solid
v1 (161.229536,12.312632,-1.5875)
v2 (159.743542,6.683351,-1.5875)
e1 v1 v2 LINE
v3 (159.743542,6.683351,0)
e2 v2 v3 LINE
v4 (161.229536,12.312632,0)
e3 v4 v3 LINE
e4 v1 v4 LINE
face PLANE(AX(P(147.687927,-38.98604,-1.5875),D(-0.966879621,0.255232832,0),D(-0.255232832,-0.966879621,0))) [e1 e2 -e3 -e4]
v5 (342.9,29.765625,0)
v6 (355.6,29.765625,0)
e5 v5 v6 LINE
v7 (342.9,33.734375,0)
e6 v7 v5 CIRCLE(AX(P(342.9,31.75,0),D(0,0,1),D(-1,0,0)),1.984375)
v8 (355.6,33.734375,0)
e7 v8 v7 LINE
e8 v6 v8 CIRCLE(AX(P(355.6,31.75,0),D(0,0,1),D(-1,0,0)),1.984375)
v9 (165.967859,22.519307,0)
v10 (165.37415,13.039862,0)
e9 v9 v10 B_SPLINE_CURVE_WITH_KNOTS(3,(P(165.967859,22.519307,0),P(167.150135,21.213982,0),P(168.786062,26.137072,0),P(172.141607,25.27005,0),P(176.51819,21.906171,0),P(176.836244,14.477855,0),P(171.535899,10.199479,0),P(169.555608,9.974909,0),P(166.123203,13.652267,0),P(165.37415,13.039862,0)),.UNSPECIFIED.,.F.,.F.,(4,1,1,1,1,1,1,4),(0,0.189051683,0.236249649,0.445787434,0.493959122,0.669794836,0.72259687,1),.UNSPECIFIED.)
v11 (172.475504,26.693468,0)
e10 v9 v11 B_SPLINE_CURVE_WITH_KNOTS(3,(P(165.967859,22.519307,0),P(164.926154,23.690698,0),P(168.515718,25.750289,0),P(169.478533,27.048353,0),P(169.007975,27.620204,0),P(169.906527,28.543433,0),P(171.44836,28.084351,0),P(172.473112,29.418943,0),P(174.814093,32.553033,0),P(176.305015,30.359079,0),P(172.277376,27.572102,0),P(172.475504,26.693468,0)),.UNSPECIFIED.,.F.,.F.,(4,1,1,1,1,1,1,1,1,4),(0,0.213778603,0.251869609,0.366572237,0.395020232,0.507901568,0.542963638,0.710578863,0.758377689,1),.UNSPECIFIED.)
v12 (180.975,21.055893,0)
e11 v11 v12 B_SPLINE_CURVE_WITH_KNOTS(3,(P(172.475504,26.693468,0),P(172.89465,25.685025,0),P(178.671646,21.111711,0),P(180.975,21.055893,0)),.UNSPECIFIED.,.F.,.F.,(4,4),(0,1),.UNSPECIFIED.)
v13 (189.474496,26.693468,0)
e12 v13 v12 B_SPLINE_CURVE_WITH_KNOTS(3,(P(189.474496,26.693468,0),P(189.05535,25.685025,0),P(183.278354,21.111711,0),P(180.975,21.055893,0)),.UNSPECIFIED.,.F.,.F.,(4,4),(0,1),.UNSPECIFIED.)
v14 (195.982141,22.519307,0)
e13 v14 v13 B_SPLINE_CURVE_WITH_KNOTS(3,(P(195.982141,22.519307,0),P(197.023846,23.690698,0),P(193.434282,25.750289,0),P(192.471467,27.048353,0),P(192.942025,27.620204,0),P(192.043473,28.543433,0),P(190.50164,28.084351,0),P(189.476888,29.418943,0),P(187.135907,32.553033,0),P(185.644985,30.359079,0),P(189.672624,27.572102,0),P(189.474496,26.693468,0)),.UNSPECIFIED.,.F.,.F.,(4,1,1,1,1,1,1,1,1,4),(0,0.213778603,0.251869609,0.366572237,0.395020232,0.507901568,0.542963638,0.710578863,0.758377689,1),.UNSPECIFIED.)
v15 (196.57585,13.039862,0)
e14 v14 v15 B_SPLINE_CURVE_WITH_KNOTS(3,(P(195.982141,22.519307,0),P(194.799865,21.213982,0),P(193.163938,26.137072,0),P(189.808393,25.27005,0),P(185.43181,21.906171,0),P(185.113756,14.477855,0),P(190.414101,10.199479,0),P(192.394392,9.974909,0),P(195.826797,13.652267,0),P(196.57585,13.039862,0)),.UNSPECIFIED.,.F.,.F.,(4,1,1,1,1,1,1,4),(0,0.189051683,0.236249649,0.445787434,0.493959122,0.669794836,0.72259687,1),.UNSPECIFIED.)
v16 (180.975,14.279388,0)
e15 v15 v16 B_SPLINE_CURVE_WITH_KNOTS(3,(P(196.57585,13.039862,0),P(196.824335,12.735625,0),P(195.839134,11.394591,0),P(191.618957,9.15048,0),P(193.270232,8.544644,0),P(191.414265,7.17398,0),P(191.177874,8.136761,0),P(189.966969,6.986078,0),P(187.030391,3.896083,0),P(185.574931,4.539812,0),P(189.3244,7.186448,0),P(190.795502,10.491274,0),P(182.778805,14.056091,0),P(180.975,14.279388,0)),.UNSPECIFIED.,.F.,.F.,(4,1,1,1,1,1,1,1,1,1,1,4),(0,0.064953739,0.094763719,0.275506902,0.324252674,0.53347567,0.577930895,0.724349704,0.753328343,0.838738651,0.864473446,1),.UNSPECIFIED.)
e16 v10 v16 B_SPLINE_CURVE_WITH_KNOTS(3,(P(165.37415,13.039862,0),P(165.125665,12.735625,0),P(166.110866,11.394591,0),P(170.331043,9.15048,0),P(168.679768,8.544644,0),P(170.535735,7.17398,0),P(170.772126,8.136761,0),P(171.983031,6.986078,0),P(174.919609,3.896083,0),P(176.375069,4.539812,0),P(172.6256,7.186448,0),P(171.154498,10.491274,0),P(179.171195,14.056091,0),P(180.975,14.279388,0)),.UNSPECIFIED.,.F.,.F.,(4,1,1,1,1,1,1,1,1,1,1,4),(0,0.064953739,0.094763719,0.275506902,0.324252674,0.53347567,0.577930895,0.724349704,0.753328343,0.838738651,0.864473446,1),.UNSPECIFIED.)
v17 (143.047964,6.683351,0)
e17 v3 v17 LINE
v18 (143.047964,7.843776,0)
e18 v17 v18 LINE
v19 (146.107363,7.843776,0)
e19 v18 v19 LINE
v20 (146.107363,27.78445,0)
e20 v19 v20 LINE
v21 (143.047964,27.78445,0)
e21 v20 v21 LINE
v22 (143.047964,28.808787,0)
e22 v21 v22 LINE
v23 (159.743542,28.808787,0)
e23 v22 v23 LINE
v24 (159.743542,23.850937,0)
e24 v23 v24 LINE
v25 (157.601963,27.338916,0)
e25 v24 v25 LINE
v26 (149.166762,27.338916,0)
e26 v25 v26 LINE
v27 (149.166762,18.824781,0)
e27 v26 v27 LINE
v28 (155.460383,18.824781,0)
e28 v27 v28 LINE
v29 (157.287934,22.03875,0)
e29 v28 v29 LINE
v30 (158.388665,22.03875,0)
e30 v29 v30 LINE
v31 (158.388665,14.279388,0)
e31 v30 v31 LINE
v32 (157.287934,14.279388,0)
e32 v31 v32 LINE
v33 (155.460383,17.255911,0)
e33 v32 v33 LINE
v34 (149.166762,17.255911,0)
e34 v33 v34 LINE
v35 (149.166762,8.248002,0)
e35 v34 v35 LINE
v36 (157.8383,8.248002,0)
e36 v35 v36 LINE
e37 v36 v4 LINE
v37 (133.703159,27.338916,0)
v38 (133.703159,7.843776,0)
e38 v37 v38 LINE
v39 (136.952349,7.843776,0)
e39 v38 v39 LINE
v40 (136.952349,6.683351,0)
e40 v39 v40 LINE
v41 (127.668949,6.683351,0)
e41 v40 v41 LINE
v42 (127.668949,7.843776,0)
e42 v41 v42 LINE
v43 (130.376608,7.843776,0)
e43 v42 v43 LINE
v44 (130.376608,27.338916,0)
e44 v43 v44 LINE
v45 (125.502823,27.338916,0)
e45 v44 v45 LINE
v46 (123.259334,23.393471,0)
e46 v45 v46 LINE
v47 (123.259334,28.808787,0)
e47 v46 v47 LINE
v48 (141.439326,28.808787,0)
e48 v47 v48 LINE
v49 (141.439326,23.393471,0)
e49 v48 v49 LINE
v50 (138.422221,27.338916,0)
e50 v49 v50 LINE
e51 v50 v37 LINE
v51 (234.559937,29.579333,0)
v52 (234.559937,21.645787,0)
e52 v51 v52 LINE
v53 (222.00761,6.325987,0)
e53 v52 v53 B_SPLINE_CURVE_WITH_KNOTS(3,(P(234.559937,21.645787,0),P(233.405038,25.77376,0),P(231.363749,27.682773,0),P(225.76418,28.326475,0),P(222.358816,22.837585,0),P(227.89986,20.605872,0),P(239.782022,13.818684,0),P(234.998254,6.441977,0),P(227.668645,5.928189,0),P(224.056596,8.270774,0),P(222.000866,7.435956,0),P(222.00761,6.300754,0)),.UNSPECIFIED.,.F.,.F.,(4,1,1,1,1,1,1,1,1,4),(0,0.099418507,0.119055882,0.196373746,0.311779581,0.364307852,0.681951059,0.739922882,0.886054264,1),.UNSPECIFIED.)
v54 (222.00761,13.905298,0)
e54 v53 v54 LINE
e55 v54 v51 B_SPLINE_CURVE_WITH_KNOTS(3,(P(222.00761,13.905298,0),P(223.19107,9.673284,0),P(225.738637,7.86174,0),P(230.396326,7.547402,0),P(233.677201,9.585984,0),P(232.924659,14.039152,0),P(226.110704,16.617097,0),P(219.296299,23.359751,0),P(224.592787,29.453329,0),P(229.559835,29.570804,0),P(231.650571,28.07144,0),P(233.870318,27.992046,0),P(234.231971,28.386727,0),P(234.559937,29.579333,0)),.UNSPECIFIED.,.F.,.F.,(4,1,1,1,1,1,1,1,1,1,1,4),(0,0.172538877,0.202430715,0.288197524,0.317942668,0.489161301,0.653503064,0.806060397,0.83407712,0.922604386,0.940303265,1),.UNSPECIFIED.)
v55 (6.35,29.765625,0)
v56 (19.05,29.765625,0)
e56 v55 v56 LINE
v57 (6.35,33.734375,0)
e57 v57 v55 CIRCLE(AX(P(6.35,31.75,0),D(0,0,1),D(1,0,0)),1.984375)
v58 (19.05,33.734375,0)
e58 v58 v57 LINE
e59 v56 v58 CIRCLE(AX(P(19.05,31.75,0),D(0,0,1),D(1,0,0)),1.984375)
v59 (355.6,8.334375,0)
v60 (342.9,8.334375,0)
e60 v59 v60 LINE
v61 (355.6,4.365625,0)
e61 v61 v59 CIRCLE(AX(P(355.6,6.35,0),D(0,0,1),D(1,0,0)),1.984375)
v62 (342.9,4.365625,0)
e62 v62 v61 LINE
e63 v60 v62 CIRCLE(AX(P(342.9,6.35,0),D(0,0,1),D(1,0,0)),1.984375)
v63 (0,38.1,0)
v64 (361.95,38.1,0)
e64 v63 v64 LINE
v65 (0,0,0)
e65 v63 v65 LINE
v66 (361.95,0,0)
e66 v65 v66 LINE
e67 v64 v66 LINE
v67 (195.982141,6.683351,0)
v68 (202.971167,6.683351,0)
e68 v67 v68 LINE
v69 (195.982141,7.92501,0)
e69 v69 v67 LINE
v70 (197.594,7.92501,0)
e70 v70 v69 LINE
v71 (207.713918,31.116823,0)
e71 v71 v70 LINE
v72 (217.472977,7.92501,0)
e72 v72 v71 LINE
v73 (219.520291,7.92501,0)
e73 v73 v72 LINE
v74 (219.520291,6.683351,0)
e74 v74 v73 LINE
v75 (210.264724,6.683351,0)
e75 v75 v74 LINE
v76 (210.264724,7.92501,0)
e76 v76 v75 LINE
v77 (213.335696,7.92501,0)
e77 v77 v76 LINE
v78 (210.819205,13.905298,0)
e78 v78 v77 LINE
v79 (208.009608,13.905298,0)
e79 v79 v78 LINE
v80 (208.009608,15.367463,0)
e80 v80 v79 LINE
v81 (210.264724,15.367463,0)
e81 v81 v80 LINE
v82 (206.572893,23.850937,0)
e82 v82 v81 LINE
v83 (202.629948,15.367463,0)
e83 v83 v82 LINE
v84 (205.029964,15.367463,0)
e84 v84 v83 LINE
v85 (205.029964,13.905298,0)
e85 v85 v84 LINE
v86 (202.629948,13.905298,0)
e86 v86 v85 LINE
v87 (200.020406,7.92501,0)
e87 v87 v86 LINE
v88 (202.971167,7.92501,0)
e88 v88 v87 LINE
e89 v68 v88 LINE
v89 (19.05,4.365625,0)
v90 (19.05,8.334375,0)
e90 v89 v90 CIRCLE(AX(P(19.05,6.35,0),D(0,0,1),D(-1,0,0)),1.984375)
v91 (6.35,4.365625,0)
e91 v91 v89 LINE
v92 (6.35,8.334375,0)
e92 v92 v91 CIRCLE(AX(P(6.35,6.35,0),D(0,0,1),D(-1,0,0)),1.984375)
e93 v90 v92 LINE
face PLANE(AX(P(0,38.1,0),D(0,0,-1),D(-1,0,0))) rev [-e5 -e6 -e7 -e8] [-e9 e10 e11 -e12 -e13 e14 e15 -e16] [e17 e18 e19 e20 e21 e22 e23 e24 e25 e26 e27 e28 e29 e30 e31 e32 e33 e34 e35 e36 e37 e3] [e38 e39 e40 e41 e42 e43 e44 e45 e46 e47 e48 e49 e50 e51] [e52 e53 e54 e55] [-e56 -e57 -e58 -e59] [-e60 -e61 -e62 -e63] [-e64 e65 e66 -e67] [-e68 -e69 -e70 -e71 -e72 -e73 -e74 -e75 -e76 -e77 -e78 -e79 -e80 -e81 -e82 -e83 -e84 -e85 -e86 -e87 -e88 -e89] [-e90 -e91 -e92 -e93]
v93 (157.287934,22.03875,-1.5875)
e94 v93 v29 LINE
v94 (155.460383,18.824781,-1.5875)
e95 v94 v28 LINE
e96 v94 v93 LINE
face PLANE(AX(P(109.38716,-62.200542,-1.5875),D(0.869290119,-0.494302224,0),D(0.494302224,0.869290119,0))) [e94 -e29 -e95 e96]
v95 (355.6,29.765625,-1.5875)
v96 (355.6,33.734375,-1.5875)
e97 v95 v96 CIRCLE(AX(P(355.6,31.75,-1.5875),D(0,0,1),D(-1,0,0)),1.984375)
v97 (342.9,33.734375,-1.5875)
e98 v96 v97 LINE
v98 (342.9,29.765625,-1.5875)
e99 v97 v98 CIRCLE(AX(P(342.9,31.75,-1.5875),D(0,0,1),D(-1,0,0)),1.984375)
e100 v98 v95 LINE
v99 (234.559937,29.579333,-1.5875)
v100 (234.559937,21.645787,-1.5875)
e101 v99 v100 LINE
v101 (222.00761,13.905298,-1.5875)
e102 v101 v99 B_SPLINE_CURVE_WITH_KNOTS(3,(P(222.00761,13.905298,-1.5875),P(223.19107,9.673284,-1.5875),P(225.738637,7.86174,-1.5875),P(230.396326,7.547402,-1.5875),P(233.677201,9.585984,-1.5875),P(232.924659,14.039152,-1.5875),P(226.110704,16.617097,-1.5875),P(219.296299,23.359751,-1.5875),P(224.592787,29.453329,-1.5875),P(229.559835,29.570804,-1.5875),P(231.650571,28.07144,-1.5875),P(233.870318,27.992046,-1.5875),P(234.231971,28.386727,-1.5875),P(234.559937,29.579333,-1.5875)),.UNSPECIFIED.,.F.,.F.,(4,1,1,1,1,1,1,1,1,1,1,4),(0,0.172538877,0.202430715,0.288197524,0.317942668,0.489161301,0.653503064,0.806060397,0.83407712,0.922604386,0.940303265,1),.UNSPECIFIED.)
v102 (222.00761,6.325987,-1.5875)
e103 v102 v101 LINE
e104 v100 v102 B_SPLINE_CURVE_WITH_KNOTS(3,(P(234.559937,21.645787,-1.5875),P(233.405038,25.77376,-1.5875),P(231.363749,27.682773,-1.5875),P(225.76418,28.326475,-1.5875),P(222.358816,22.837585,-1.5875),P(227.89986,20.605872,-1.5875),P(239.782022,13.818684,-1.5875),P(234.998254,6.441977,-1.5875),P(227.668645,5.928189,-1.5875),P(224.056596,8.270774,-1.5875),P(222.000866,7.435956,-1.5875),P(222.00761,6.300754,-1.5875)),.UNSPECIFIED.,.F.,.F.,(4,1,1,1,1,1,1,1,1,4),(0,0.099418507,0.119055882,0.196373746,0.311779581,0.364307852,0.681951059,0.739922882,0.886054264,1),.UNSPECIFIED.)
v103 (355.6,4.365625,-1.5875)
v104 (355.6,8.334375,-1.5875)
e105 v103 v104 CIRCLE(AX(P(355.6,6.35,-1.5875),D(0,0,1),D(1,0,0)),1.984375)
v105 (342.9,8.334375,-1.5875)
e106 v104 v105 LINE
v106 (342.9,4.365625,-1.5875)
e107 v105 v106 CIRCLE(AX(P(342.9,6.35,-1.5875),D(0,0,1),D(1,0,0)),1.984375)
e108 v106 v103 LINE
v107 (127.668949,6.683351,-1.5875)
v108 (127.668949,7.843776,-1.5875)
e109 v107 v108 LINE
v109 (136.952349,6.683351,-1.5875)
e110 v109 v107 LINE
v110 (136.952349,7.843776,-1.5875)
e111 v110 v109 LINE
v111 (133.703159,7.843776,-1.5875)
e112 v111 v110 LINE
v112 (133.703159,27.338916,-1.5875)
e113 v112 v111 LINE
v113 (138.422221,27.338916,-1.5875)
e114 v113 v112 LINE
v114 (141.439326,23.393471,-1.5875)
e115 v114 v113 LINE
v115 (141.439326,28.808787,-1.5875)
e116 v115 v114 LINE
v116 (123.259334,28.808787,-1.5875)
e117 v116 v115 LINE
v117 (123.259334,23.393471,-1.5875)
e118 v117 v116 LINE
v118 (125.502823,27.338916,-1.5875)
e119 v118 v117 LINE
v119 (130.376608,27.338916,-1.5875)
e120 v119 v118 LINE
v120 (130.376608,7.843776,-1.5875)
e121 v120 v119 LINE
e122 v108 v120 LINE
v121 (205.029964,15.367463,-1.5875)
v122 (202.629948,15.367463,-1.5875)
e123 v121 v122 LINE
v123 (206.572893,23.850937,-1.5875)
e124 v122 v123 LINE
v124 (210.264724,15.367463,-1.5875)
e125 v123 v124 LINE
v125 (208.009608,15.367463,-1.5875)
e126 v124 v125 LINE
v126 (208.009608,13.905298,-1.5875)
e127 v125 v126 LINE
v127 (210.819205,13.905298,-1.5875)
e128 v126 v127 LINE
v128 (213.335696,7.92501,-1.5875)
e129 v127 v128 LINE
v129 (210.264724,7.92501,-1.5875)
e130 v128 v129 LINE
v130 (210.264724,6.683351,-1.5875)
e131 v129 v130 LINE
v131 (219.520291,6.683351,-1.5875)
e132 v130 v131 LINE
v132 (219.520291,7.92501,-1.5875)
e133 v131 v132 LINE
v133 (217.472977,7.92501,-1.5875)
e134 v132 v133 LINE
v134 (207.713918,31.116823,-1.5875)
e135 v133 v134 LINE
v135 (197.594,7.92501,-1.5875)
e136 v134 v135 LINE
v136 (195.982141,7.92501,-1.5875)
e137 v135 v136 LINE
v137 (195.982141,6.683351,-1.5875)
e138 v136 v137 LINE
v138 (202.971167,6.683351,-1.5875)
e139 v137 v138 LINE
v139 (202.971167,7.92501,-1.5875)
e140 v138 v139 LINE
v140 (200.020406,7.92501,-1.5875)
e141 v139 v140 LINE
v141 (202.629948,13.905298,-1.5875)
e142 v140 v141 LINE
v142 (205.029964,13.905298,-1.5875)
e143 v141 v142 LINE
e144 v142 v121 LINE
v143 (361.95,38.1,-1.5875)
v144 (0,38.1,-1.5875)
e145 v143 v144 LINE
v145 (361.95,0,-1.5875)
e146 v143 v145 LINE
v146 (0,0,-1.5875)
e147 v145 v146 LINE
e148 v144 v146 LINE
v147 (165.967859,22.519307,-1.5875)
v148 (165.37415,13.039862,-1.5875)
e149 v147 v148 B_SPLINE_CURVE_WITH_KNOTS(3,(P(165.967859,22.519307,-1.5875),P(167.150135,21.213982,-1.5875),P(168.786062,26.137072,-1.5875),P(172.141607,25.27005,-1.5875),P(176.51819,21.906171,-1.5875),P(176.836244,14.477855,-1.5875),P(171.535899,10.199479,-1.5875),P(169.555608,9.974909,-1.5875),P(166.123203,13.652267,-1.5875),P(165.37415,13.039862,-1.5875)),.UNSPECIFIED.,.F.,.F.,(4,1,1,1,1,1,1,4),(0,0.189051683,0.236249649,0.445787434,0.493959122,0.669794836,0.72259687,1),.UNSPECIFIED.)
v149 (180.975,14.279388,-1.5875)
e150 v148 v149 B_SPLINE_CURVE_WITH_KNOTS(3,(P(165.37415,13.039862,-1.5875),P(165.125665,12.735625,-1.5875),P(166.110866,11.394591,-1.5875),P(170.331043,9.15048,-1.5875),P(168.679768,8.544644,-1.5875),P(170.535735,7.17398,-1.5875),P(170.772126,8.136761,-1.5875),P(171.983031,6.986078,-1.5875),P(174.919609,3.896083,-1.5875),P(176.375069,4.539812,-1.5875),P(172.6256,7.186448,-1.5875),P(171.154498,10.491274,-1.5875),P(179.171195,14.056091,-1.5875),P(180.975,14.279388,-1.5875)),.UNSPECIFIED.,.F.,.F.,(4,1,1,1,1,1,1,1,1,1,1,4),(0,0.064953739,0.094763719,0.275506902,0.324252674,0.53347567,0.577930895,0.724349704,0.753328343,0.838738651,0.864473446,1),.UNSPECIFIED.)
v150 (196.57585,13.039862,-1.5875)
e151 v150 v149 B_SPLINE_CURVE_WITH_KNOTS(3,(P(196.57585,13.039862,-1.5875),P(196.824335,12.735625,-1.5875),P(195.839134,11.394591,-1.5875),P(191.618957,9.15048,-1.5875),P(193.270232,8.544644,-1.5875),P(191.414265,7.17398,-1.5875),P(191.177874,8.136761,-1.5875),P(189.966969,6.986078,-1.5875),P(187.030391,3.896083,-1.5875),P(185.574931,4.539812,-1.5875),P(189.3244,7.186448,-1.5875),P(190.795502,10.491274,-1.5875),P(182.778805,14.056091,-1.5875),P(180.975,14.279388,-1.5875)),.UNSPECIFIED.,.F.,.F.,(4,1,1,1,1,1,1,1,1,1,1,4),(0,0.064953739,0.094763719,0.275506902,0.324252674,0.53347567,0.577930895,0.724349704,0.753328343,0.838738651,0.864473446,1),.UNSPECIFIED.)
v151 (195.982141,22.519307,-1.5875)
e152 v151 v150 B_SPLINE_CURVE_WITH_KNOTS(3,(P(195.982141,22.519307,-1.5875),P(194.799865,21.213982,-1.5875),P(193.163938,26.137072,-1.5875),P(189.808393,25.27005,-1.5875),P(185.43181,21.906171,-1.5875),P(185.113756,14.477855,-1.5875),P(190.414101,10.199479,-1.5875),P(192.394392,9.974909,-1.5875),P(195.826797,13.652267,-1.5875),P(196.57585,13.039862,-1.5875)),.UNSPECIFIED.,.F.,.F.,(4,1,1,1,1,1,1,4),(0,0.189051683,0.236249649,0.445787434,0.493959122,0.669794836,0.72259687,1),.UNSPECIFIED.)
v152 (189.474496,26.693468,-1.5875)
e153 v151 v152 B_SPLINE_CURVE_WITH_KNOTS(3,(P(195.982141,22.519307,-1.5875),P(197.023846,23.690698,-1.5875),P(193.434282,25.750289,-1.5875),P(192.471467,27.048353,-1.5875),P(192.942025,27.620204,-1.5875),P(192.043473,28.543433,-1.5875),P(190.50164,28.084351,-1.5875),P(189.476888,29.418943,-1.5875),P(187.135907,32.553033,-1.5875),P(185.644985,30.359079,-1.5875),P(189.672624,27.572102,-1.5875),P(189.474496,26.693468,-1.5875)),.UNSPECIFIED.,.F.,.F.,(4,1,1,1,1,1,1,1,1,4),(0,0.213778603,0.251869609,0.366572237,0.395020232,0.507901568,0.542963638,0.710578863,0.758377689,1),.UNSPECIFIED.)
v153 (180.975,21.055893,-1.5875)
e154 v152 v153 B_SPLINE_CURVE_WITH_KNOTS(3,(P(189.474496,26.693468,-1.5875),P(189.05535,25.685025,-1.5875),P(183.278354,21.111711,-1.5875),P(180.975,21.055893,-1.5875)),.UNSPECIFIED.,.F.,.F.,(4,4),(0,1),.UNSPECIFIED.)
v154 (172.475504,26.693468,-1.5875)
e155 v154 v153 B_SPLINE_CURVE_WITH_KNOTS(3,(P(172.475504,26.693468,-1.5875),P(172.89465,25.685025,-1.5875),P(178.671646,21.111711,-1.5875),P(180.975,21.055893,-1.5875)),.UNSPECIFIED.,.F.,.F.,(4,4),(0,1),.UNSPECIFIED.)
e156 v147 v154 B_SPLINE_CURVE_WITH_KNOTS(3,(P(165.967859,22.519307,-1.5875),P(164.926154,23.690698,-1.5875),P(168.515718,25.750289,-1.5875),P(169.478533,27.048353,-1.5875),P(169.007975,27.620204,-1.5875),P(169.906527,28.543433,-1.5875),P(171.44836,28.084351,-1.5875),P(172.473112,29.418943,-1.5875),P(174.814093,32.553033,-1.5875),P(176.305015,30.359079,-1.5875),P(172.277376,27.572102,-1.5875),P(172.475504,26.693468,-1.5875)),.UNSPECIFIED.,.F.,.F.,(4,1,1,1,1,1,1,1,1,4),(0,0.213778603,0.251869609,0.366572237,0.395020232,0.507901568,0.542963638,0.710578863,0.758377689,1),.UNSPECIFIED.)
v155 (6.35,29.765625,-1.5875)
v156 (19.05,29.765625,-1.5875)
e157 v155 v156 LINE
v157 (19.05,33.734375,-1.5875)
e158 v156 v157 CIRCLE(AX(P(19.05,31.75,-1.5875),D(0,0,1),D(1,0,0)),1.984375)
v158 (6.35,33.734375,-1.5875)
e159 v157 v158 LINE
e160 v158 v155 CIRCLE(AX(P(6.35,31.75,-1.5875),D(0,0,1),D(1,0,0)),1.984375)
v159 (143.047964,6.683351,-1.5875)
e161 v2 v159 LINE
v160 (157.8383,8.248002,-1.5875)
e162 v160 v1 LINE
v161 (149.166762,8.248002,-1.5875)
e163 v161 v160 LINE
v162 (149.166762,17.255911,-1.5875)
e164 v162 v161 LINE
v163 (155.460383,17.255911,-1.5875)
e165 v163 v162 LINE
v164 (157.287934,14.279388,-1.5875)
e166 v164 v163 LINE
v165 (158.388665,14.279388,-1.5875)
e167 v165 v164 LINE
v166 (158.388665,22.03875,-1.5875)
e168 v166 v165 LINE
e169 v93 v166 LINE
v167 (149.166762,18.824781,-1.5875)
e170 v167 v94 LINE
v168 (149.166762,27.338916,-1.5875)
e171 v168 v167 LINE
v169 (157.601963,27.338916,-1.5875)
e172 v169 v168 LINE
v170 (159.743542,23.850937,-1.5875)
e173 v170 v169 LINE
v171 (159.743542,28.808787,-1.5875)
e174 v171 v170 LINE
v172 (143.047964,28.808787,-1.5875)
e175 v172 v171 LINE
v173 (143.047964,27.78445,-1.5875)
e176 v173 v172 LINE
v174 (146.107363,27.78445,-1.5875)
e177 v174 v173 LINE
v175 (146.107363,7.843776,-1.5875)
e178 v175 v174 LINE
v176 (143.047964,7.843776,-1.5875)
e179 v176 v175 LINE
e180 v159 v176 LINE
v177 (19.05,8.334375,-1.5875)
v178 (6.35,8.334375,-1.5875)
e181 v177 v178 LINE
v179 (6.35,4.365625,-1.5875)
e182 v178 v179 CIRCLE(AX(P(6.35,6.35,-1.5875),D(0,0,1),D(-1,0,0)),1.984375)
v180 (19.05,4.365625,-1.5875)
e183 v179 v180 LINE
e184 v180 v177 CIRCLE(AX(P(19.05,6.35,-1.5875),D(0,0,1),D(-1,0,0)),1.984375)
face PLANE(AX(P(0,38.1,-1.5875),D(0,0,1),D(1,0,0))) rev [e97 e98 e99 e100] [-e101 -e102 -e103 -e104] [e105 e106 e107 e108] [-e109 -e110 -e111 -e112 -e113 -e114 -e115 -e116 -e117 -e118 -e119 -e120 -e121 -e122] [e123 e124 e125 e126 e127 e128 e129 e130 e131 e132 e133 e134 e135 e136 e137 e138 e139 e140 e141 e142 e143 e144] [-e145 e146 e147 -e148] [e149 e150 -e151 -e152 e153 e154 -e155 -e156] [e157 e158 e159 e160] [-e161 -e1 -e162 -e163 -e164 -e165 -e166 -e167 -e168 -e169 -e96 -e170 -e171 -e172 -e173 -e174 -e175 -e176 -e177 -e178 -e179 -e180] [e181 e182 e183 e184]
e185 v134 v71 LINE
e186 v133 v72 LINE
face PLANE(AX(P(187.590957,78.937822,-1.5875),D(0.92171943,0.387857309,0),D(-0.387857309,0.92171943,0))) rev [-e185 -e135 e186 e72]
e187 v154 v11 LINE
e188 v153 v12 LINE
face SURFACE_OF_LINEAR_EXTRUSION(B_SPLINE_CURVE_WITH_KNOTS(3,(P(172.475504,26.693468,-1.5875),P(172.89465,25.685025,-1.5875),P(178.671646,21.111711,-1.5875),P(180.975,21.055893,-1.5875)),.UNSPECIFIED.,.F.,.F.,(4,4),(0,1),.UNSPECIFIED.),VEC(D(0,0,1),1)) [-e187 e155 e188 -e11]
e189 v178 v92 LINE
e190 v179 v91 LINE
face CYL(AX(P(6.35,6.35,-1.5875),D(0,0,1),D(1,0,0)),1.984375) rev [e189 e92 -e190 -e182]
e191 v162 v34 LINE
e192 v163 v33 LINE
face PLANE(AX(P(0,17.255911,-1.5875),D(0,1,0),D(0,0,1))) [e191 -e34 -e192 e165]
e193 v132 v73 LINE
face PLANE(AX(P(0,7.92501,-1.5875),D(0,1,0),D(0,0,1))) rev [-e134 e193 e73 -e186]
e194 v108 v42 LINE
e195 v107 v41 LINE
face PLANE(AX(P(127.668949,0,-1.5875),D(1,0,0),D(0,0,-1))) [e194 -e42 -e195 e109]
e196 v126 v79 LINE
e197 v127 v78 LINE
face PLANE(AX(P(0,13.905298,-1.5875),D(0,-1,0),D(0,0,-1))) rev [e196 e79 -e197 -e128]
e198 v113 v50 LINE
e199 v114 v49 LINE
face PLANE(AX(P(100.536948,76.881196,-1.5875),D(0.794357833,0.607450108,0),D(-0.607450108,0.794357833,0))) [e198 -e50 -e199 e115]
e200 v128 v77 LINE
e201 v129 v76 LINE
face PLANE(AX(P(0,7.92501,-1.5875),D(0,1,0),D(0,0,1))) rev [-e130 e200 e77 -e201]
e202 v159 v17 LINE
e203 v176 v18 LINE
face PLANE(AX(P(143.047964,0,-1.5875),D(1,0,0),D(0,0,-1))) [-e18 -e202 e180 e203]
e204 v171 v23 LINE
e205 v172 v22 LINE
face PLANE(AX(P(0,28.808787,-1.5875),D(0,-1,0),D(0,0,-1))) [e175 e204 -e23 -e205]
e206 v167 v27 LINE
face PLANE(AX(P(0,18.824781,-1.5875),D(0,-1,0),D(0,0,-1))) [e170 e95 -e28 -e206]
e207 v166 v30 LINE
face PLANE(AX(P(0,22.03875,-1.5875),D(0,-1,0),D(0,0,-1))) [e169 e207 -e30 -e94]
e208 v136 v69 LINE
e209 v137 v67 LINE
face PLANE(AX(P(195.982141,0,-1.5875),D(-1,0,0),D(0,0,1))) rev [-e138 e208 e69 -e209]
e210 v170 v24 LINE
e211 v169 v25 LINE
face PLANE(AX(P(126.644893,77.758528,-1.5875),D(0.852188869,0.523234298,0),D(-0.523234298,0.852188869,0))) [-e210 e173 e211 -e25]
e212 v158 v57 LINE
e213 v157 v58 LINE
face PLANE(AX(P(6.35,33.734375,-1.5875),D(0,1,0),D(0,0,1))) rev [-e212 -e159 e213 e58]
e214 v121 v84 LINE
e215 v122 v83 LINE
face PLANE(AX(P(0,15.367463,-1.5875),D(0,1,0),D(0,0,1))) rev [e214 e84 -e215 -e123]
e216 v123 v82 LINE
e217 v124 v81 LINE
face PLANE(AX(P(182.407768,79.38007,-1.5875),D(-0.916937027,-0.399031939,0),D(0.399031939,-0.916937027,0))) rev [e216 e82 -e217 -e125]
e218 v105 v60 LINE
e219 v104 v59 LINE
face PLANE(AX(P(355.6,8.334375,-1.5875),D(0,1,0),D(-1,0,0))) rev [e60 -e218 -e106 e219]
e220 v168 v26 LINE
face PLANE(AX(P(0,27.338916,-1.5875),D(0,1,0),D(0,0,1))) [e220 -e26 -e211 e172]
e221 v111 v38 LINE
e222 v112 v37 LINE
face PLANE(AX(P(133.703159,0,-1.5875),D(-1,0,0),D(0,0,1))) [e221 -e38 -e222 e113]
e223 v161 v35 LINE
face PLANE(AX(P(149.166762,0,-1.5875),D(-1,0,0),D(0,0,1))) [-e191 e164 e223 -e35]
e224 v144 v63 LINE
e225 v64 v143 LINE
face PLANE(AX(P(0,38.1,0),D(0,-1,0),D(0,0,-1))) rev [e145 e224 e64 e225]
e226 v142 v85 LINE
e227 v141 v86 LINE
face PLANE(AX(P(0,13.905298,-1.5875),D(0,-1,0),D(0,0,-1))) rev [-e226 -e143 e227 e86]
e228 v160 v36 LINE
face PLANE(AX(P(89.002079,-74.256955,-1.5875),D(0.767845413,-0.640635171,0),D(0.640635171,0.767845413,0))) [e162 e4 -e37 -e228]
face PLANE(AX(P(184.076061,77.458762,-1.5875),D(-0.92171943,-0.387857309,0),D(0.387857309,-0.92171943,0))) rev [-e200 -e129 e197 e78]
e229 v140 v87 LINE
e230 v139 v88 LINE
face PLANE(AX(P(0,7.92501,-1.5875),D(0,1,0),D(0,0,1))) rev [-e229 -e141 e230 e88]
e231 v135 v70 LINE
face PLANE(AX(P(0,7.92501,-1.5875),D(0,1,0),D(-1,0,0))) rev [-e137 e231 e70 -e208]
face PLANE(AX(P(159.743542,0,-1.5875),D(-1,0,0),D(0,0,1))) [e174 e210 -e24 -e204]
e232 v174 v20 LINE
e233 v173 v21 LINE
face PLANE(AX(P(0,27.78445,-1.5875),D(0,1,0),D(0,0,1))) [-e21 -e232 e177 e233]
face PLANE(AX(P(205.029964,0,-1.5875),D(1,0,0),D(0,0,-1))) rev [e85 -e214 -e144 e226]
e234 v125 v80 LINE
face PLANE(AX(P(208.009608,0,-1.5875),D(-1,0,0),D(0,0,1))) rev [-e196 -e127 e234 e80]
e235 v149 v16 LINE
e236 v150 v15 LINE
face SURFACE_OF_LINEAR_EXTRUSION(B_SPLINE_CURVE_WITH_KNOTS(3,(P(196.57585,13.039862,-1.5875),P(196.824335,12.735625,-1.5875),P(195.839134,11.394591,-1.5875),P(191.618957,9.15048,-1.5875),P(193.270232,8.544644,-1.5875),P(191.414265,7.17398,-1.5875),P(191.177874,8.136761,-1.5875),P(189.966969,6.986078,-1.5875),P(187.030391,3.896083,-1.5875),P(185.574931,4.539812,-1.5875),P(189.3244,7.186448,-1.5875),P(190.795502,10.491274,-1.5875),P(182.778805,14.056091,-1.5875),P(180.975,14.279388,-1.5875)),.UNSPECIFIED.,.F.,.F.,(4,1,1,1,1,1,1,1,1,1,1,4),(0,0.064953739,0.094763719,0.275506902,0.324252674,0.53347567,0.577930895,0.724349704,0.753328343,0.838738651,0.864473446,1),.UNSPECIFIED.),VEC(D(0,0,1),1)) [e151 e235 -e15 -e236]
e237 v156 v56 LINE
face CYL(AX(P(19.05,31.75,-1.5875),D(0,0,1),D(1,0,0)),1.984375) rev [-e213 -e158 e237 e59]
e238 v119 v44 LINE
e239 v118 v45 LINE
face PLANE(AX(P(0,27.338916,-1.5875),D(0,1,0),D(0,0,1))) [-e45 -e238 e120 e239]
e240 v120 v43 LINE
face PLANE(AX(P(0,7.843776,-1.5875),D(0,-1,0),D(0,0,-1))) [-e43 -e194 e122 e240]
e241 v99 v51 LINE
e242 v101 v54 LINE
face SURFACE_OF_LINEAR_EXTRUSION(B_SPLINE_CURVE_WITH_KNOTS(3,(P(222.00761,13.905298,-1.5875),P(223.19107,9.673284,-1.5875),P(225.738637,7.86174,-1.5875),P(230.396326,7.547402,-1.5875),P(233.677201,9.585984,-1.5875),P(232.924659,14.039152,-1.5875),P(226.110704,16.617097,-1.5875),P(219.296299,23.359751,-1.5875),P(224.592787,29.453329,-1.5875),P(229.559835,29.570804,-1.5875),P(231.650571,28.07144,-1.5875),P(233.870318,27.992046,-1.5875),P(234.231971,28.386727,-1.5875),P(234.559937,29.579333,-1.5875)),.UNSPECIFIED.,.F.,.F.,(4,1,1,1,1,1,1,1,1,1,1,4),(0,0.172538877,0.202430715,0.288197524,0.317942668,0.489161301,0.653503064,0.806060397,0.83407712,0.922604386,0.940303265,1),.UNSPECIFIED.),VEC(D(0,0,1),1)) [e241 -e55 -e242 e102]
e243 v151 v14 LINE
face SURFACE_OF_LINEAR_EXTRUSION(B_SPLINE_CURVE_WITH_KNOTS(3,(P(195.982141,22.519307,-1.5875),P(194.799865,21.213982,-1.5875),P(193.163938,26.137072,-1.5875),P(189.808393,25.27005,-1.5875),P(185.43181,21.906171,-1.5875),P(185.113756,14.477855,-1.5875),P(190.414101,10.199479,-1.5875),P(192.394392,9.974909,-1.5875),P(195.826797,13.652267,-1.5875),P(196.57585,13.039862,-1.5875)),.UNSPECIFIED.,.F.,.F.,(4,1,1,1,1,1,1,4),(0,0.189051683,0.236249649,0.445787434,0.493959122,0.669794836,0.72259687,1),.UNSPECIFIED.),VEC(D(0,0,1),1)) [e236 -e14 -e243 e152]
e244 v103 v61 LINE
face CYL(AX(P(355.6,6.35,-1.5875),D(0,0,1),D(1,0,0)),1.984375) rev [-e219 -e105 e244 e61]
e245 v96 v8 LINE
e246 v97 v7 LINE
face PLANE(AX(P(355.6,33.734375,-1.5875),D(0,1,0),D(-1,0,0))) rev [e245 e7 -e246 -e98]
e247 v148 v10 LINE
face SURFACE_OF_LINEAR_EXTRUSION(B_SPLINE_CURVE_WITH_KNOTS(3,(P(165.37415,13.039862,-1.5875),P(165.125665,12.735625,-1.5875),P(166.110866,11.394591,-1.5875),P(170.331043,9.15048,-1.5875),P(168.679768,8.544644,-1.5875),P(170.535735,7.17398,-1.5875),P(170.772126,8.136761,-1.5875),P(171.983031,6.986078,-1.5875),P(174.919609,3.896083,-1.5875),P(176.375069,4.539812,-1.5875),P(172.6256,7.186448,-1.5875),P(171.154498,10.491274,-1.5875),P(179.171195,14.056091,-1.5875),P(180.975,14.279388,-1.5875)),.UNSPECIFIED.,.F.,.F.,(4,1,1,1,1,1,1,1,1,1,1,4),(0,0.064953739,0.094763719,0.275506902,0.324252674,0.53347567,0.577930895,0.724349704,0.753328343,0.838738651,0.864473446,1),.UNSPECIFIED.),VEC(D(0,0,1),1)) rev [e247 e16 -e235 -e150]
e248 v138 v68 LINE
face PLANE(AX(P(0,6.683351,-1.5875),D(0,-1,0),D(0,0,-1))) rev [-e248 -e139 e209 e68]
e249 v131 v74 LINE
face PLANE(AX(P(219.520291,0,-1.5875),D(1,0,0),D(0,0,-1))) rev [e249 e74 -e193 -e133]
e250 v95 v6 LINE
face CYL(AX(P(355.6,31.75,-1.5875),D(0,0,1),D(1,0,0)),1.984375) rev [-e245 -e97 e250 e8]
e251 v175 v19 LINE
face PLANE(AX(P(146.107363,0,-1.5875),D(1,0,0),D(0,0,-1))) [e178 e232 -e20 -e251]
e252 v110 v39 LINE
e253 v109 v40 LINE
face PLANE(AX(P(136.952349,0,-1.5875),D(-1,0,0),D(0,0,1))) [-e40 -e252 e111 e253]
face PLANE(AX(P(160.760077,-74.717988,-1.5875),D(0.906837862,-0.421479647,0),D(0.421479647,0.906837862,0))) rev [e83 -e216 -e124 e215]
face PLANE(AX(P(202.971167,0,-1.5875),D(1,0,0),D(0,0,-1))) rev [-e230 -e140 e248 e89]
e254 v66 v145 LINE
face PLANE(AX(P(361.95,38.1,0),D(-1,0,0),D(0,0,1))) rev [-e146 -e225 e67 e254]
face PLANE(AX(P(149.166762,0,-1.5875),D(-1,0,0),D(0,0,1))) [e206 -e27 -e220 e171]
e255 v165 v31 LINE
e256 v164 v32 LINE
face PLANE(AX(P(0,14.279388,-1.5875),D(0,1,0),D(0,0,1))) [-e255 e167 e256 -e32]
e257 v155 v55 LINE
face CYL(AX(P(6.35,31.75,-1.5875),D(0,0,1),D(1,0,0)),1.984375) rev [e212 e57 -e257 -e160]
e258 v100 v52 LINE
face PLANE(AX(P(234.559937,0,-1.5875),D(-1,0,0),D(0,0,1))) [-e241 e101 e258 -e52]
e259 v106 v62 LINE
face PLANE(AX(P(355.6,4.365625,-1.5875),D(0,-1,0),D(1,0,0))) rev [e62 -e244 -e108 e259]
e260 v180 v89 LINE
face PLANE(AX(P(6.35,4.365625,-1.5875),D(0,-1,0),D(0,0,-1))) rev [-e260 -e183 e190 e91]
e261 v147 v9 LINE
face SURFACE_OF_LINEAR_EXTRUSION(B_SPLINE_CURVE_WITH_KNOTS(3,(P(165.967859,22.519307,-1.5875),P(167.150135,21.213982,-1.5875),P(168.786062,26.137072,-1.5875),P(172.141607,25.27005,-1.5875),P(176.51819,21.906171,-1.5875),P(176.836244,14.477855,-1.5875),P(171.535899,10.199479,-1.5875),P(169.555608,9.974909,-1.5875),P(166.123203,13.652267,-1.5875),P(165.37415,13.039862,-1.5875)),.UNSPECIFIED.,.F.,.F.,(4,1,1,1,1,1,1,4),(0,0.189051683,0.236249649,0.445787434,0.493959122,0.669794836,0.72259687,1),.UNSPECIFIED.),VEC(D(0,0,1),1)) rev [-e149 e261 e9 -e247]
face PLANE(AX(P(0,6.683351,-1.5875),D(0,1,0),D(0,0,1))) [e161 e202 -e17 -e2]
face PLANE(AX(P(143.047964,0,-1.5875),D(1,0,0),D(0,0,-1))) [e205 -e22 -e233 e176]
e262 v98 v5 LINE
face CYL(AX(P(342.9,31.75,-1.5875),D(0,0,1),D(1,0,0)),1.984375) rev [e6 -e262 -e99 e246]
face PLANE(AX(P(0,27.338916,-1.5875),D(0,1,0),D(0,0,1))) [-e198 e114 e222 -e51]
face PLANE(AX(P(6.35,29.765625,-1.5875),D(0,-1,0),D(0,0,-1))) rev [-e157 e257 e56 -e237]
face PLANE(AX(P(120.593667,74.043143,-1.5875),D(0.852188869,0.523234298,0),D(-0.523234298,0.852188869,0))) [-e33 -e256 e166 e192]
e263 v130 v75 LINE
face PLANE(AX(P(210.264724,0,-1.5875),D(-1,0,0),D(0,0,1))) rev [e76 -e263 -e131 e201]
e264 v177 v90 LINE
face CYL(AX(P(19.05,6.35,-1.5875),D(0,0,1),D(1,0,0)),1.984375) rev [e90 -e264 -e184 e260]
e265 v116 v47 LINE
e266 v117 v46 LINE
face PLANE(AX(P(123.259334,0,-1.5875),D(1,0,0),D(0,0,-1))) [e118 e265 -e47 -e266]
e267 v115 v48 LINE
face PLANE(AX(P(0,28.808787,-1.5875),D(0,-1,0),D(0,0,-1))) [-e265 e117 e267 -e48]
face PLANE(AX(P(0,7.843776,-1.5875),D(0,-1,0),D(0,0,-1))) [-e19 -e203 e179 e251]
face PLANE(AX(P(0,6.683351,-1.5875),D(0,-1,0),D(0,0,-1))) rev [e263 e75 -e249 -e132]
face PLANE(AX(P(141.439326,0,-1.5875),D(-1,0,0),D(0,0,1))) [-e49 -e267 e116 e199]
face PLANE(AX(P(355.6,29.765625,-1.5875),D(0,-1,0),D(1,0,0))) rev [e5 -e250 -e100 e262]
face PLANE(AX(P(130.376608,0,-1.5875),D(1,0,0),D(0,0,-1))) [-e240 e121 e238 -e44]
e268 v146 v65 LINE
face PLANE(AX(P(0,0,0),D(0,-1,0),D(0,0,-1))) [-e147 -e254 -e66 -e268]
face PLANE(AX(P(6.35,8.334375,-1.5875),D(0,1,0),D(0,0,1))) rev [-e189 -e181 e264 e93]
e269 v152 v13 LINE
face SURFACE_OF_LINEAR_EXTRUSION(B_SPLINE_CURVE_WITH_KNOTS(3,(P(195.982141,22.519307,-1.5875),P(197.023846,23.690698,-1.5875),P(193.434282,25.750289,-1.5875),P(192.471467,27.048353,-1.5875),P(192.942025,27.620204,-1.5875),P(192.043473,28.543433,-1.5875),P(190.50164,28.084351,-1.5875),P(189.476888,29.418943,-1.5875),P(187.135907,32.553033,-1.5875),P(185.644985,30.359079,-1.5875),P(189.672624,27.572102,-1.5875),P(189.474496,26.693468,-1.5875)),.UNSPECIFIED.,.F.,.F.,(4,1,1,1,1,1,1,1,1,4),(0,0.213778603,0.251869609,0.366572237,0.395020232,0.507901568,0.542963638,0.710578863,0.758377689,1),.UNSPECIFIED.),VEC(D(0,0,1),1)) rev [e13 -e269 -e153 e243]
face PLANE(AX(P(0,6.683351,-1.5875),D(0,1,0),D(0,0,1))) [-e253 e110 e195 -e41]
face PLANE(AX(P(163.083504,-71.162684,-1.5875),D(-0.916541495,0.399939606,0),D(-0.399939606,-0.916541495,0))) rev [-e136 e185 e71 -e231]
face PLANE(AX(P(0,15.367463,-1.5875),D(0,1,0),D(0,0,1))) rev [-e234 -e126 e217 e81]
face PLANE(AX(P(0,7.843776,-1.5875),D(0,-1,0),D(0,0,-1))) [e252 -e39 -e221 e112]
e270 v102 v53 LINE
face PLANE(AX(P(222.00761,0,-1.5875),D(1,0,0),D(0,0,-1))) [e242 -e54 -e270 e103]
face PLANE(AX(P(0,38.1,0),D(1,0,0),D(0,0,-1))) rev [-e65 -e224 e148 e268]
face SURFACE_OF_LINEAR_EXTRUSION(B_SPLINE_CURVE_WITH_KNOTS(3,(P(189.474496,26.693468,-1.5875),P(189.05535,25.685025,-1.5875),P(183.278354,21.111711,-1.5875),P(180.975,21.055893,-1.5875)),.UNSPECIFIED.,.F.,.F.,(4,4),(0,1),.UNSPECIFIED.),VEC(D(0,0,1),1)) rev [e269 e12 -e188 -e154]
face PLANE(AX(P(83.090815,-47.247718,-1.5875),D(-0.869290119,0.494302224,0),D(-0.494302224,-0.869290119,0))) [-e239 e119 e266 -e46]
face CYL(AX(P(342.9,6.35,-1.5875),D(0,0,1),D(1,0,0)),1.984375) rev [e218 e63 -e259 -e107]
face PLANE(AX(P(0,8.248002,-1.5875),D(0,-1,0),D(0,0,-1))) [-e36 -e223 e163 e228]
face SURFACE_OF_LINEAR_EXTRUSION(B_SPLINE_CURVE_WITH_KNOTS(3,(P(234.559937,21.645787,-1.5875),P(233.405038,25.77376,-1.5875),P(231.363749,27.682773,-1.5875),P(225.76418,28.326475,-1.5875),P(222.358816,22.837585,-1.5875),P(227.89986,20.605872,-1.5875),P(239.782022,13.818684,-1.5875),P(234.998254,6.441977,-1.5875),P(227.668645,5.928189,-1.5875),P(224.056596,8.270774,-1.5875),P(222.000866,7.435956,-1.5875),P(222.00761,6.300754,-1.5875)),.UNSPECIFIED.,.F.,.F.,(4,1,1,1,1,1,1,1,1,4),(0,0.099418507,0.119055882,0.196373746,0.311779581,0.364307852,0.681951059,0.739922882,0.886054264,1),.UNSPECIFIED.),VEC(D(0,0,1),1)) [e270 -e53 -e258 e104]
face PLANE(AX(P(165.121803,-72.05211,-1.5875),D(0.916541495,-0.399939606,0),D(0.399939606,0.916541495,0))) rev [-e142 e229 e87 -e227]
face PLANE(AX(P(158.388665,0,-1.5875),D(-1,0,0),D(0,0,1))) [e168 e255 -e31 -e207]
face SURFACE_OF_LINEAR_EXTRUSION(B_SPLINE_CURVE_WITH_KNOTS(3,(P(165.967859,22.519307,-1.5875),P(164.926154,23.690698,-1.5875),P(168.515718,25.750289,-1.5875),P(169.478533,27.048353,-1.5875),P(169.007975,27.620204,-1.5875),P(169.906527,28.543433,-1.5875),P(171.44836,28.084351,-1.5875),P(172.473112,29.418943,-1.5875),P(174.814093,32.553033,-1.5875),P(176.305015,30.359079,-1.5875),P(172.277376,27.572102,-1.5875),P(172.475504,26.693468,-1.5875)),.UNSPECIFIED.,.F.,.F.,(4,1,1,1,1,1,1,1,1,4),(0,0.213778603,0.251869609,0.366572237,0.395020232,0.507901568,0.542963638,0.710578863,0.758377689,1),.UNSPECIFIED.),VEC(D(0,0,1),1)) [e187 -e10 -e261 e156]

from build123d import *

# Parameters (mm, degrees)
BOSS_EXTRUDE1_DEPTH = 38.1
CUT_EXTRUDE2_DEPTH  = 364.95320119
CUT_EXTRUDE3_START  = -1.5875
CUT_EXTRUDE3_DEPTH  = 1.5875


# Read off the part's stored shape, not the designer's step: Cut-Extrude3
with BuildPart() as part:
    # Sketch1 → Boss-Extrude1 (new body)
    with BuildSketch(Plane(origin=(0, 0, 0), x_dir=(1, 0, 0), z_dir=(0, 1, 0))):
        Polygon((0, 0), (361.95, 0), (361.95, 1.5875), (336.55, 1.5875), (25.4, 1.5875), (0, 1.5875), align=None)
    extrude(amount=BOSS_EXTRUDE1_DEPTH)

    # Sketch3 → Cut-Extrude2 (cut, through all)
    with BuildSketch(Plane.XY):
        with BuildLine():
            Line((6.35, 33.734375), (19.05, 33.734375))
            ThreePointArc((19.05, 33.734375), (21.034375, 31.75), (19.05, 29.765625))
            Line((19.05, 29.765625), (6.35, 29.765625))
            ThreePointArc((6.35, 29.765625), (4.365625, 31.75), (6.35, 33.734375))
        make_face()
        with BuildLine():
            Line((6.35, 4.365625), (19.05, 4.365625))
            ThreePointArc((19.05, 4.365625), (21.034375, 6.35), (19.05, 8.334375))
            Line((19.05, 8.334375), (6.35, 8.334375))
            ThreePointArc((6.35, 8.334375), (4.365625, 6.35), (6.35, 4.365625))
        make_face()
        with BuildLine():
            Line((355.6, 4.365625), (342.9, 4.365625))
            ThreePointArc((342.9, 4.365625), (340.915625, 6.35), (342.9, 8.334375))
            Line((342.9, 8.334375), (355.6, 8.334375))
            ThreePointArc((355.6, 8.334375), (357.584375, 6.35), (355.6, 4.365625))
        make_face()
        with BuildLine():
            Line((355.6, 33.734375), (342.9, 33.734375))
            ThreePointArc((342.9, 33.734375), (340.915625, 31.75), (342.9, 29.765625))
            Line((342.9, 29.765625), (355.6, 29.765625))
            ThreePointArc((355.6, 29.765625), (357.584375, 31.75), (355.6, 33.734375))
        make_face()
    extrude(amount=-CUT_EXTRUDE2_DEPTH, mode=Mode.SUBTRACT)

    # Cut-Extrude3 outline → Cut-Extrude3 (cut)
    with BuildSketch(Plane.XY.offset(CUT_EXTRUDE3_START)):
        with BuildLine():
            add(Edge.make_bspline(
                [(195.982140594, 22.51930704), (194.799865236, 21.213982115), (193.163937726, 26.137072488), (189.808392954, 25.270049762), (185.431809743, 21.906170571), (185.113755929, 14.477855146), (190.414101335, 10.199478727), (192.394392235, 9.974909474), (195.826797456, 13.652267497), (196.575850419, 13.039862322)],
                knots=[0, 0, 0, 0, 0.189051683, 0.236249649, 0.445787434, 0.493959122, 0.669794836, 0.72259687, 1, 1, 1, 1], degree=3))
            add(Edge.make_bspline(
                [(195.982140594, 22.51930704), (197.02384643, 23.690697654), (193.434281531, 25.750289011), (192.471466966, 27.04835261), (192.942024759, 27.620203849), (192.043472718, 28.543432617), (190.501640111, 28.084350881), (189.476887898, 29.418942555), (187.135907428, 32.553032704), (185.644984613, 30.359079477), (189.672624323, 27.572101913), (189.47449607, 26.693468459)],
                knots=[0, 0, 0, 0, 0.213778603, 0.251869609, 0.366572237, 0.395020232, 0.507901568, 0.542963638, 0.710578863, 0.758377689, 1, 1, 1, 1], degree=3))
            add(Edge.make_bspline(
                [(189.47449607, 26.693468459), (189.055350229, 25.68502545), (183.278354398, 21.111711372), (180.975, 21.055893079)],
                knots=[0, 0, 0, 0, 1, 1, 1, 1], degree=3))
            add(Edge.make_bspline(
                [(172.47550393, 26.693468459), (172.894649771, 25.68502545), (178.671645602, 21.111711372), (180.975, 21.055893079)],
                knots=[0, 0, 0, 0, 1, 1, 1, 1], degree=3))
            add(Edge.make_bspline(
                [(165.967859406, 22.51930704), (164.92615357, 23.690697654), (168.515718469, 25.750289011), (169.478533034, 27.04835261), (169.007975241, 27.620203849), (169.906527282, 28.543432617), (171.448359889, 28.084350881), (172.473112102, 29.418942555), (174.814092572, 32.553032704), (176.305015387, 30.359079477), (172.277375677, 27.572101913), (172.47550393, 26.693468459)],
                knots=[0, 0, 0, 0, 0.213778603, 0.251869609, 0.366572237, 0.395020232, 0.507901568, 0.542963638, 0.710578863, 0.758377689, 1, 1, 1, 1], degree=3))
            add(Edge.make_bspline(
                [(165.967859406, 22.51930704), (167.150134764, 21.213982115), (168.786062274, 26.137072488), (172.141607046, 25.270049762), (176.518190257, 21.906170571), (176.836244071, 14.477855146), (171.535898665, 10.199478727), (169.555607765, 9.974909474), (166.123202544, 13.652267497), (165.374149581, 13.039862322)],
                knots=[0, 0, 0, 0, 0.189051683, 0.236249649, 0.445787434, 0.493959122, 0.669794836, 0.72259687, 1, 1, 1, 1], degree=3))
            add(Edge.make_bspline(
                [(165.374149581, 13.039862322), (165.125665487, 12.735624807), (166.110865819, 11.394591), (170.331042773, 9.150480258), (168.679768277, 8.544643648), (170.535734674, 7.173980297), (170.772126154, 8.136761028), (171.983030665, 6.986077763), (174.91960902, 3.896083053), (176.375069108, 4.539812082), (172.62560022, 7.186447587), (171.154498021, 10.491273862), (179.171195487, 14.056091072), (180.975, 14.279388426)],
                knots=[0, 0, 0, 0, 0.064953739, 0.094763719, 0.275506902, 0.324252674, 0.53347567, 0.577930895, 0.724349704, 0.753328343, 0.838738651, 0.864473446, 1, 1, 1, 1], degree=3))
            add(Edge.make_bspline(
                [(196.575850419, 13.039862322), (196.824334513, 12.735624807), (195.839134181, 11.394591), (191.618957227, 9.150480258), (193.270231723, 8.544643648), (191.414265326, 7.173980297), (191.177873846, 8.136761028), (189.966969335, 6.986077763), (187.03039098, 3.896083053), (185.574930892, 4.539812082), (189.32439978, 7.186447587), (190.795501979, 10.491273862), (182.778804513, 14.056091072), (180.975, 14.279388426)],
                knots=[0, 0, 0, 0, 0.064953739, 0.094763719, 0.275506902, 0.324252674, 0.53347567, 0.577930895, 0.724349704, 0.753328343, 0.838738651, 0.864473446, 1, 1, 1, 1], degree=3))
        make_face()
        with BuildLine():
            add(Edge.make_bspline(
                [(234.559937197, 21.645787396), (233.405038462, 25.773760499), (231.363748975, 27.682772658), (225.764180175, 28.326475371), (222.358816397, 22.837585378), (227.899860485, 20.605871866), (239.782021852, 13.818683951), (234.998253663, 6.441976622), (227.668644767, 5.928189123), (224.066232809, 8.264523772), (222.014289381, 7.441374025), (222.007609782, 6.32598658)],
                knots=[0, 0, 0, 0, 0.099418507, 0.119055882, 0.196373746, 0.311779581, 0.364307852, 0.681951059, 0.739922882, 0.886054264, 0.999151476, 0.999151476, 0.999151476, 0.999151476], degree=3))
            Line((234.559937197, 21.645787396), (234.559937197, 29.5793327))
            add(Edge.make_bspline(
                [(222.00760979, 13.905297607), (223.191069921, 9.673284198), (225.738636972, 7.861739614), (230.39632568, 7.547401713), (233.677201092, 9.585984013), (232.924658543, 14.03915234), (226.110704155, 16.617096632), (219.29629893, 23.359750676), (224.592787354, 29.453328502), (229.559834974, 29.570804062), (231.65057135, 28.071440195), (233.870318457, 27.992046353), (234.231970618, 28.386726957), (234.559937197, 29.5793327)],
                knots=[0, 0, 0, 0, 0.172538877, 0.202430715, 0.288197524, 0.317942668, 0.489161301, 0.653503064, 0.806060397, 0.83407712, 0.922604386, 0.940303265, 1, 1, 1, 1], degree=3))
            Line((222.00760979, 13.905297607), (222.007609782, 6.32598658))
        make_face()
        Polygon((123.259334489, 28.808787432), (123.259334489, 23.393470937), (125.502822751, 27.338915812), (130.376607596, 27.338915812), (130.376607596, 7.843776432), (127.668949349, 7.843776432), (127.668949349, 6.683351469), (136.952349054, 6.683351469), (136.952349054, 7.843776432), (133.703159157, 7.843776432), (133.703159157, 27.338915812), (138.422220674, 27.338915812), (141.439325578, 23.393470937), (141.439325578, 28.808787432), align=None)
        Polygon((159.743542233, 28.808787432), (143.047964228, 28.808787432), (143.047964228, 27.784450216), (146.107363339, 27.784450216), (146.107363339, 7.843776432), (143.047964228, 7.843776432), (143.047964228, 6.683351469), (159.743542233, 6.683351469), (161.229536087, 12.312631855), (157.838299976, 8.248001608), (149.16676245, 8.248001608), (149.16676245, 17.255910832), (155.460383478, 17.255910832), (157.287934469, 14.279388426), (158.388665484, 14.279388426), (158.388665484, 22.038750376), (157.287934469, 22.038750376), (155.460383478, 18.824781391), (149.16676245, 18.824781391), (149.16676245, 27.338915812), (157.601962855, 27.338915812), (159.743542233, 23.850937073), align=None)
        Polygon((195.982140594, 7.925010214), (195.982140594, 6.683351469), (202.971167131, 6.683351469), (202.971167131, 7.925010214), (200.020405801, 7.925010214), (202.629948082, 13.905297607), (205.029963996, 13.905297607), (205.029963996, 15.367463245), (202.629948082, 15.367463245), (206.572892797, 23.850937073), (210.264724304, 15.367463245), (208.009608137, 15.367463245), (208.009608137, 13.905297607), (210.819205258, 13.905297607), (213.335695745, 7.925010214), (210.264724304, 7.925010214), (210.264724304, 6.683351469), (219.520291009, 6.683351469), (219.520291009, 7.925010214), (217.472976714, 7.925010214), (207.713917718, 31.116823492), (197.593999839, 7.925010214), align=None)
    extrude(amount=CUT_EXTRUDE3_DEPTH, mode=Mode.SUBTRACT)


solid = part.part
